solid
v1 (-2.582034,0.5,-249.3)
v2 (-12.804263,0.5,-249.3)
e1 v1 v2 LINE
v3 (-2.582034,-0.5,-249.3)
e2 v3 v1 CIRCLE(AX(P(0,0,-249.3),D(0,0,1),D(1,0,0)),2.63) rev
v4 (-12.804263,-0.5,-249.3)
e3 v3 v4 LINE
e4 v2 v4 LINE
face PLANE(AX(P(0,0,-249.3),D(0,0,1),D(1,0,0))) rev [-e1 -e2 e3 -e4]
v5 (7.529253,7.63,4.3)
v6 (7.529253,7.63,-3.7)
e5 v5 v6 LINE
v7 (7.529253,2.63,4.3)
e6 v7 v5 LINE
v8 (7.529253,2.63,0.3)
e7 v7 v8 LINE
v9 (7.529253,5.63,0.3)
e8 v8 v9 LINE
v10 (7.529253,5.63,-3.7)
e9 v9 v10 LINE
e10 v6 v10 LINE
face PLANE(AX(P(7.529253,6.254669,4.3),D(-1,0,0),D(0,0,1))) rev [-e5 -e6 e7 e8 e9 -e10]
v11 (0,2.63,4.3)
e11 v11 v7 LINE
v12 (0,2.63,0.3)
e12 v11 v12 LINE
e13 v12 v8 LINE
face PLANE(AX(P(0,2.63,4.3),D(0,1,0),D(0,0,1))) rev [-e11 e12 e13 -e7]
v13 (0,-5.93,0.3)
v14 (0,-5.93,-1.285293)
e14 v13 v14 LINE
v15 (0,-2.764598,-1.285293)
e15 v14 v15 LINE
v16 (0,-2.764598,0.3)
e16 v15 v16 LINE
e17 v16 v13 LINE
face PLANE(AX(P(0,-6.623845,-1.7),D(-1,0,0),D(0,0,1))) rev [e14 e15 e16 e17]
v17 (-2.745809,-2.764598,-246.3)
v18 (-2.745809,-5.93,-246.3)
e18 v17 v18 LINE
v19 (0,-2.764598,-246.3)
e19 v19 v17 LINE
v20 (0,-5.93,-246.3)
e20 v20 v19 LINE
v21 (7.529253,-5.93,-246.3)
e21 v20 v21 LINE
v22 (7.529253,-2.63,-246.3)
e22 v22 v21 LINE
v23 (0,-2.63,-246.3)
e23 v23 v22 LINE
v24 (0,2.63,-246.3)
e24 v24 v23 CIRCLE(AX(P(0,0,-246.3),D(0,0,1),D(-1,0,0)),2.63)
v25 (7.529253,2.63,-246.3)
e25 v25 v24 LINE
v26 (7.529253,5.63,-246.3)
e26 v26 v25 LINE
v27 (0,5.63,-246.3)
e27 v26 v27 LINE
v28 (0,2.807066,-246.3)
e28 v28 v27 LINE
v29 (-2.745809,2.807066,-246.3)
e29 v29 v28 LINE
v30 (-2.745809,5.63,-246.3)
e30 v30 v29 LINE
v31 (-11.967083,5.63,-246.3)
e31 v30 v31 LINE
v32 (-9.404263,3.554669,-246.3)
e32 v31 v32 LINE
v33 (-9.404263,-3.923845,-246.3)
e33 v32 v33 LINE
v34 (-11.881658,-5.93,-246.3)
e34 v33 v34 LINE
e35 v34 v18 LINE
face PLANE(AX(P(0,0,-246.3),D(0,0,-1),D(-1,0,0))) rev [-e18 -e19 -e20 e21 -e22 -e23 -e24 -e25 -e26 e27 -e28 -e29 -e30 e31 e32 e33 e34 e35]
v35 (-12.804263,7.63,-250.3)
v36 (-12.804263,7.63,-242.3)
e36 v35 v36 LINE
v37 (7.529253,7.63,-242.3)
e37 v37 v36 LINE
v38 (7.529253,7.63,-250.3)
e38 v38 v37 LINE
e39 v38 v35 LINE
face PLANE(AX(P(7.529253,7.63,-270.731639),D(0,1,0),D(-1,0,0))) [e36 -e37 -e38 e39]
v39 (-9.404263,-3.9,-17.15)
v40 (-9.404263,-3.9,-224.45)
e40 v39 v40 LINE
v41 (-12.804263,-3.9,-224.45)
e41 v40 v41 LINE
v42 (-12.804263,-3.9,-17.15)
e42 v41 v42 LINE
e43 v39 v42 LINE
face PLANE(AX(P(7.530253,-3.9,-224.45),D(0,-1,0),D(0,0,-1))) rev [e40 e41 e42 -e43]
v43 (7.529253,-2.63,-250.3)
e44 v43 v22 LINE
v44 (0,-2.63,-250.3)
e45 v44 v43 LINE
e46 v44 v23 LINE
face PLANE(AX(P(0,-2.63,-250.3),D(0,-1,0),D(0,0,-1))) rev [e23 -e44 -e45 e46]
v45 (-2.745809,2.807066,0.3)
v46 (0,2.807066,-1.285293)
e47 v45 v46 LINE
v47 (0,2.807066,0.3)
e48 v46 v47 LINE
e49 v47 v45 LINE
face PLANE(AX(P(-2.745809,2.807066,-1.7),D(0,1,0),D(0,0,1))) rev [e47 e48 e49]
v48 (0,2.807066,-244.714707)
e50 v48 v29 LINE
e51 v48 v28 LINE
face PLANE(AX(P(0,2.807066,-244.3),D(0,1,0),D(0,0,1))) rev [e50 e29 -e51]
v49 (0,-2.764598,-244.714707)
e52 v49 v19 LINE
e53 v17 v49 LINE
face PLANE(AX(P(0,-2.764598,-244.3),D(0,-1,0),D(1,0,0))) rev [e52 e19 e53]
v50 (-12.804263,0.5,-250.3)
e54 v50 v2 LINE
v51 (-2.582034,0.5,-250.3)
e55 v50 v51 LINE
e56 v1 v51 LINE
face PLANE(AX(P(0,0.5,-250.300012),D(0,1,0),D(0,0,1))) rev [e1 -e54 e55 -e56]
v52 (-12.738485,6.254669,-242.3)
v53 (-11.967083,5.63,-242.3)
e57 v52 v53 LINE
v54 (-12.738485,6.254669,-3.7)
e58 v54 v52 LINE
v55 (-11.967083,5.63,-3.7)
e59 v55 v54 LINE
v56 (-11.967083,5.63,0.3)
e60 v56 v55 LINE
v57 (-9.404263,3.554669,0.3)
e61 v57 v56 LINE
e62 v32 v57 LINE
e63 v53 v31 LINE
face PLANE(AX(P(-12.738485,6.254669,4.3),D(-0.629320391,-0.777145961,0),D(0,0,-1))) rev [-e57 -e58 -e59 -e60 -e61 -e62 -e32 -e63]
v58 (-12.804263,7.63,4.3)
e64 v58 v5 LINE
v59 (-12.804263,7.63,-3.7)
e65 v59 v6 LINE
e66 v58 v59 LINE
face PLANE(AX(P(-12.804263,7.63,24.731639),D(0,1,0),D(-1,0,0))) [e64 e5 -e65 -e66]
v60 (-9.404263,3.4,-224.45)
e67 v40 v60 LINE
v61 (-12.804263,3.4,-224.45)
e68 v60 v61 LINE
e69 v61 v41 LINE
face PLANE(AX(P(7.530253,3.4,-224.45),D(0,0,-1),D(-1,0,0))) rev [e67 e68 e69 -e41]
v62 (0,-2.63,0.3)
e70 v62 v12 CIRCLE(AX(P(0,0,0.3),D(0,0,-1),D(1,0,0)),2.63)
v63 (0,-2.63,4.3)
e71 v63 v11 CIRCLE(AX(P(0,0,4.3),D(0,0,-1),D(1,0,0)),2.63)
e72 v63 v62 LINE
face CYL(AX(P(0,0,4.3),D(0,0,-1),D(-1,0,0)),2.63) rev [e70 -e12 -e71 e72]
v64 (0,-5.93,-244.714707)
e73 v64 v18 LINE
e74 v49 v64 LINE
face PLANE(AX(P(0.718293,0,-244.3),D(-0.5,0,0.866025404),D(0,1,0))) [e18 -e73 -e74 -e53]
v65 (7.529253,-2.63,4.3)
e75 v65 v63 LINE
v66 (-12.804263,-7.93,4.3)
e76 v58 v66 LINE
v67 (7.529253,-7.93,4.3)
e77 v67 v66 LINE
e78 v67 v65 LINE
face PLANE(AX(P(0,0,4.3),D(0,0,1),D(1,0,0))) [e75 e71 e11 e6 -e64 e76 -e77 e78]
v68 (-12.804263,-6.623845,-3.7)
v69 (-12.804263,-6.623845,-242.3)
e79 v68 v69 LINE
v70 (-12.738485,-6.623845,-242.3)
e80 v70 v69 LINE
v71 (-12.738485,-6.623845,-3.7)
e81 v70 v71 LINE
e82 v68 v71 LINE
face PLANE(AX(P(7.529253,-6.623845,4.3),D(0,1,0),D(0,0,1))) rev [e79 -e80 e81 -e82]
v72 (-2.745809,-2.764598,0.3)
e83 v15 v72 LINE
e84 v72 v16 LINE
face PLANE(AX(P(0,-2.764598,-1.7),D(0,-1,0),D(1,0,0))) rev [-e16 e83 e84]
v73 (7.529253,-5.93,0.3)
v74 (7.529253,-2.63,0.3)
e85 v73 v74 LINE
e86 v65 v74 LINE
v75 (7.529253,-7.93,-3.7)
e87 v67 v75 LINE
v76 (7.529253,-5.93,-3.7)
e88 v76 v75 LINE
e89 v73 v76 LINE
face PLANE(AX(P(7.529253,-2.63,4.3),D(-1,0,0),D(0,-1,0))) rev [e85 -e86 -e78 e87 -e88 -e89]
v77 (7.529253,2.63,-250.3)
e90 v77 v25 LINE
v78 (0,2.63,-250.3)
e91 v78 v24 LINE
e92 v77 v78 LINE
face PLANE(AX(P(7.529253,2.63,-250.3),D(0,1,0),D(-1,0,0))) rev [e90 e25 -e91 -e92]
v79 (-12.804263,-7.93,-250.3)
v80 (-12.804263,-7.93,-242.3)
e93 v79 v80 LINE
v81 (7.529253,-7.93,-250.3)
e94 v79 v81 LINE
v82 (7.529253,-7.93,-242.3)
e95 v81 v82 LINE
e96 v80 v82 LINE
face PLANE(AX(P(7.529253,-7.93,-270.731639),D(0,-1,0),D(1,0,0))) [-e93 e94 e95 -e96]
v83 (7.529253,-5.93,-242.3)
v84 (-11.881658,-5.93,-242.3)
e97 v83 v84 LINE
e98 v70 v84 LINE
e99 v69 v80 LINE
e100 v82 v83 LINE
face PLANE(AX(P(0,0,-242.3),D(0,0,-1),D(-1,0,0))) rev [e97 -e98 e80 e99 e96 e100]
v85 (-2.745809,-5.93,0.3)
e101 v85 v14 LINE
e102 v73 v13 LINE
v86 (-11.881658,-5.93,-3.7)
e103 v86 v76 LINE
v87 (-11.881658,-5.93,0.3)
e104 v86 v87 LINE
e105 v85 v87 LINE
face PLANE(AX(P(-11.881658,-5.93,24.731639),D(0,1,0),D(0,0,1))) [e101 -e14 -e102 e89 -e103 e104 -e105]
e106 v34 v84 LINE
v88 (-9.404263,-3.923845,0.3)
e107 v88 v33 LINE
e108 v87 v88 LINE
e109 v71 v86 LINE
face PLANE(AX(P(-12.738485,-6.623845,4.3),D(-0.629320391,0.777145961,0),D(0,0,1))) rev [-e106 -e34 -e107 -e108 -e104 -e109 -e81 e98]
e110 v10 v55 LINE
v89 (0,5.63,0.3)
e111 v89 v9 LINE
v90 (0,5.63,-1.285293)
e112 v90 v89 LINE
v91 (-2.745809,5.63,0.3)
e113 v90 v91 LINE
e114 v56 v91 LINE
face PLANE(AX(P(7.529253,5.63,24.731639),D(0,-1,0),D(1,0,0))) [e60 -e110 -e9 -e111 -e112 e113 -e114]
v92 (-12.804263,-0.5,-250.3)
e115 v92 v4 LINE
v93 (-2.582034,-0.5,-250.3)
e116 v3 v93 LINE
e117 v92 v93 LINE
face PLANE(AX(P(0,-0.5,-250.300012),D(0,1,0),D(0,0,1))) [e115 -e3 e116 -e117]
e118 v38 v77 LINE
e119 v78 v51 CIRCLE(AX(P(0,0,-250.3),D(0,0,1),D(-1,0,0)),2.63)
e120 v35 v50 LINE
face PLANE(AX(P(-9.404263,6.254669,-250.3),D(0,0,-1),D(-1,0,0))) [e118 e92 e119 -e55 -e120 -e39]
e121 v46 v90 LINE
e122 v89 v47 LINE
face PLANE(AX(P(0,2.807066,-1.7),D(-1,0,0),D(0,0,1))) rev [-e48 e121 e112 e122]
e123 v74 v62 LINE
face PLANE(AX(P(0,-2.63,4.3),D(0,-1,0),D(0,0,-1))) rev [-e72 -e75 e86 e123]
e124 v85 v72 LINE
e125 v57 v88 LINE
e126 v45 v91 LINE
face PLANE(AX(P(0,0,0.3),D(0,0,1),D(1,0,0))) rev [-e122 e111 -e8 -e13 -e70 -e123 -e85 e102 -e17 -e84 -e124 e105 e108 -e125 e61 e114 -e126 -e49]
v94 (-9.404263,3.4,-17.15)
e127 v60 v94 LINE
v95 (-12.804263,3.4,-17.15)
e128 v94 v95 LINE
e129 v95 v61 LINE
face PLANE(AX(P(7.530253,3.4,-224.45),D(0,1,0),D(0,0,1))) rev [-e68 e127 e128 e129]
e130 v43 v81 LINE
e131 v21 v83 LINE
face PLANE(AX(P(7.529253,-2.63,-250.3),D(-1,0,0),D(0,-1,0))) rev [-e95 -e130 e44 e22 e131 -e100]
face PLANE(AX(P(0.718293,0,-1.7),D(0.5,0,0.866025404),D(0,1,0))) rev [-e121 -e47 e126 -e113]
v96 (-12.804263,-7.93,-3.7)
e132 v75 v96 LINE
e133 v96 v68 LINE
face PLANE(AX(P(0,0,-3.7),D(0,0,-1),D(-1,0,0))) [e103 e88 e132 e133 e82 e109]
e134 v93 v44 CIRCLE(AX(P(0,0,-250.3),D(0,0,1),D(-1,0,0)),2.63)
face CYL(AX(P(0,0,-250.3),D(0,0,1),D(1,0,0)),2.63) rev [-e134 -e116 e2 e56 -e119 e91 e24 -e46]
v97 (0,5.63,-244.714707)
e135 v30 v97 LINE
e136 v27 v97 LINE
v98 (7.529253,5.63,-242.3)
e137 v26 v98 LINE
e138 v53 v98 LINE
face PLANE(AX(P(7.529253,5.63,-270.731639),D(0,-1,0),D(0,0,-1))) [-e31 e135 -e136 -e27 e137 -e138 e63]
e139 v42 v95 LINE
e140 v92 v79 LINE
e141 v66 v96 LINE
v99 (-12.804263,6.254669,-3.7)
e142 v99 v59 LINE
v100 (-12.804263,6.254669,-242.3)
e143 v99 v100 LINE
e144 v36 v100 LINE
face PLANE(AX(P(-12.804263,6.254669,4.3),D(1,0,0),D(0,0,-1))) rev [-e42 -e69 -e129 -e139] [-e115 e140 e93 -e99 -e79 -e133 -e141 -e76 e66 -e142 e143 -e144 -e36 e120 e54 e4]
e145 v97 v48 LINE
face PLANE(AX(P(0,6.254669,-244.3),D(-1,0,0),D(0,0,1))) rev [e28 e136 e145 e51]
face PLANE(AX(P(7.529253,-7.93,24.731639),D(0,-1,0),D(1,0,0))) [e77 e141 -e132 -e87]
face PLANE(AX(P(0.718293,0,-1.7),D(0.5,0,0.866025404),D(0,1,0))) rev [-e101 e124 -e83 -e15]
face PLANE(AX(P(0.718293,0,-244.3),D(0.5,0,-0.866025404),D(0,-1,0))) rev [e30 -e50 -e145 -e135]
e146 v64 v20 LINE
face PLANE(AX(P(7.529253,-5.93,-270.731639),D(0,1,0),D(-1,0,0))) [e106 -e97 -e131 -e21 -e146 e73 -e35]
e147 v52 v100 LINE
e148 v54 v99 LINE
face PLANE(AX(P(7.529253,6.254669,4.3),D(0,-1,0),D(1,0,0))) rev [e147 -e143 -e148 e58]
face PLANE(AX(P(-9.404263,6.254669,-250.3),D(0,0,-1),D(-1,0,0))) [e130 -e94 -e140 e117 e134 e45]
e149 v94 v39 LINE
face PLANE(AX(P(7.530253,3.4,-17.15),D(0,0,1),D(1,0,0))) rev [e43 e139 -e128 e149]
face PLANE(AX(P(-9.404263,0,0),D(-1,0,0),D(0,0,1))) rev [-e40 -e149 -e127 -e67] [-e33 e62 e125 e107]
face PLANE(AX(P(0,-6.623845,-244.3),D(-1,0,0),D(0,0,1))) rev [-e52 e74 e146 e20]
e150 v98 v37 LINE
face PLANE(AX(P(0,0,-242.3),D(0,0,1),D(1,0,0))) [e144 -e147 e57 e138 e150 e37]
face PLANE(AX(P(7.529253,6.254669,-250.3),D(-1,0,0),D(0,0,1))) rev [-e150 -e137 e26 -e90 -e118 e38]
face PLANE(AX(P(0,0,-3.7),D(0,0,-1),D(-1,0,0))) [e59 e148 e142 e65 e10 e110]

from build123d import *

# Parameters (mm, degrees)
EXTRUDE_START              = 0.3
EXTRUDE_1_DEPTH            = 4
EXTRUDE_2_DEPTH            = 4
SKETCH_3_W                 = 254.6
SKETCH_3_H                 = 12.878514778
EXTRUDE_3_DEPTH            = 3.4
CUT_EXTRUDE_1_REACH        = 253.212
SKETCH_4_W                 = 207.3
SKETCH_4_H                 = 7.3
SKETCH_5_W                 = 2.745808793
SKETCH_5_H                 = 3.85924733
SKETCH_5_H_2               = 3.447603815
EXTRUDE_4_DEPTH            = 2
SKETCH_6_W                 = 2.745808793
SKETCH_6_H                 = 3.85924733
SKETCH_6_H_2               = 3.447603815
EXTRUDE_5_DEPTH            = 2
CHAMFER_1_SIZE             = 3.464101615
CHAMFER_1_SIZE_2           = 2
CHAMFER_2_SIZE             = 2.7
CHAMFER_2_SIZE2            = 3.334222323
EXTRUDE_START_2            = -4
SKETCH_7_W                 = 20.333516096
SKETCH_7_H                 = 2
EXTRUDE_6_DEPTH            = 8
EXTRUDE_7_DEPTH            = 4
EXTRUDE_7_DEPTH_BACK       = 4
CUT_EXTRUDE_1_2_DEPTH      = 256.045082384
CUT_EXTRUDE_1_2_DEPTH_BACK = 1
SKETCH_9_W                 = 12.804262888
SKETCH_9_H                 = 1


with BuildPart() as part:
    # 草图1 → 凸台-拉伸1 (new body)
    with BuildSketch(Plane.XY.offset(EXTRUDE_START)):
        with BuildLine():
            Line((7.529253208, 6.254669476), (-12.804262888, 6.254669476))
            Line((-12.804262888, 6.254669476), (-12.804262888, -6.623845302))
            Line((-12.804262888, -6.623845302), (7.529253208, -6.623845302))
            Line((7.529253208, -6.623845302), (7.529253208, -2.63))
            Line((7.529253208, -2.63), (0, -2.63))
            ThreePointArc((0, -2.63), (-2.63, 0), (0, 2.63))
            Line((0, 2.63), (7.529253208, 2.63))
            Line((7.529253208, 2.63), (7.529253208, 6.254669476))
        make_face()
    extrude(amount=EXTRUDE_1_DEPTH)



with BuildPart() as body_2:
    # 草图2 → 凸台-拉伸2 (new body)
    with BuildSketch(Plane(origin=(0, 0, -246.3), x_dir=(-1, 0, 0), z_dir=(0, 0, -1))):
        with BuildLine():
            Line((-7.529253208, 6.254669476), (-7.529253208, 2.63))
            Line((-7.529253208, 2.63), (0, 2.63))
            ThreePointArc((0, 2.63), (2.63, 0), (0, -2.63))
            Line((0, -2.63), (-7.529253208, -2.63))
            Line((-7.529253208, -2.63), (-7.529253208, -6.623845302))
            Line((-7.529253208, -6.623845302), (12.804262888, -6.623845302))
            Line((12.804262888, -6.623845302), (12.804262888, 6.254669476))
            Line((12.804262888, 6.254669476), (-7.529253208, 6.254669476))
        make_face()
    extrude(amount=EXTRUDE_2_DEPTH)


with BuildPart() as part_1:
    add(part.part)

    add(body_2.part)  # 凸台-拉伸3 merges body 2
    # 草图3 → 凸台-拉伸3 (add)
    with BuildSketch(Plane.ZY.offset(12.804262888)):
        with Locations((-123, -0.184587913)):
            Rectangle(SKETCH_3_W, SKETCH_3_H)
    extrude(amount=-EXTRUDE_3_DEPTH)

    # 草图4 → Cut-Extrude 1 (cut, up to next)
    with BuildSketch(Plane.ZY.offset(12.804262888), mode=Mode.PRIVATE) as cut_extrude_1_sk1:
        with Locations((-120.8, -0.25)):
            Rectangle(SKETCH_4_W, SKETCH_4_H)
    cut_extrude_1_tool1 = extrude(cut_extrude_1_sk1.sketch, amount=-CUT_EXTRUDE_1_REACH, mode=Mode.PRIVATE) & part_1.part
    add(cut_extrude_1_tool1.solids().sort_by_distance((-12.804263, -0.25, -120.8))[0], mode=Mode.SUBTRACT)

    # 草图5 → 凸台-拉伸4 (add)
    with BuildSketch(Plane.XY.offset(-246.3)):
        with Locations((-1.372904397, -4.694221637)):
            Rectangle(SKETCH_5_W, SKETCH_5_H)
        with Locations((-1.372904397, 4.530867568)):
            Rectangle(SKETCH_5_W, SKETCH_5_H_2)
    extrude(amount=EXTRUDE_4_DEPTH)

    # 草图6 → 凸台-拉伸5 (add)
    with BuildSketch(Plane(origin=(0, 0, 0.3), x_dir=(-1, 0, 0), z_dir=(0, 0, -1))):
        with Locations((1.372904397, -4.694221637)):
            Rectangle(SKETCH_6_W, SKETCH_6_H)
        with Locations((1.372904397, 4.530867568)):
            Rectangle(SKETCH_6_W, SKETCH_6_H_2)
    extrude(amount=EXTRUDE_5_DEPTH)

    # 倒角1
    # the kernel refuses this chamfer: 3.464101615, 2 mm, written as the material it takes off along each edge
    with BuildSketch(Plane(origin=(-2.745808793, 15.216597417, -244.3), x_dir=(0.9998132206222079, 0, 0.01932676561270368), z_dir=(0, -1, 0))) as chamfer_1_piece_1_section:
        Polygon((CHAMFER_1_SIZE * 0.999813220662, -CHAMFER_1_SIZE * 0.0193267656135), (-CHAMFER_1_SIZE_2 * 0.0193267656127, -CHAMFER_1_SIZE_2 * 0.999813220622), (0, 0), align=None)
    chamfer_1_piece_1 = extrude(amount=21.371459697, mode=Mode.PRIVATE)
    chamfer_1_piece_1 = split(chamfer_1_piece_1, bisect_by=Plane(origin=(-1.581226814, 4.530867568, -246.3), z_dir=(0, 0, 1)), keep=Keep.TOP, mode=Mode.PRIVATE)
    add(chamfer_1_piece_1, mode=Mode.SUBTRACT)
    with BuildSketch(Plane(origin=(-2.745808793, -15.585773243, -244.3), x_dir=(-0.057893862402670956, 0, -0.9983227437537926), z_dir=(0, 1, 0))) as chamfer_1_piece_2_section:
        Polygon((CHAMFER_1_SIZE_2 * 0.998322743754, -CHAMFER_1_SIZE_2 * 0.0578938624027), (-CHAMFER_1_SIZE * 0.057893862405, -CHAMFER_1_SIZE * 0.998322743793), (0, 0), align=None)
    chamfer_1_piece_2 = extrude(amount=21.783103212, mode=Mode.PRIVATE)
    chamfer_1_piece_2 = split(chamfer_1_piece_2, bisect_by=Plane(origin=(-1.581226814, -4.694221637, -246.3), z_dir=(0, 0, 1)), keep=Keep.TOP, mode=Mode.PRIVATE)
    add(chamfer_1_piece_2, mode=Mode.SUBTRACT)
    with BuildSketch(Plane(origin=(-2.745808793, 6.197329969, -1.7), x_dir=(-0.057893862402671255, 0, 0.9983227437537926), z_dir=(0, -1, 0))) as chamfer_1_piece_3_section:
        Polygon((CHAMFER_1_SIZE_2 * 0.998322743754, -CHAMFER_1_SIZE_2 * 0.0578938624027), (-CHAMFER_1_SIZE * 0.057893862405, -CHAMFER_1_SIZE * 0.998322743793), (0, 0), align=None)
    chamfer_1_piece_3 = extrude(amount=21.783103212, mode=Mode.PRIVATE)
    chamfer_1_piece_3 = split(chamfer_1_piece_3, bisect_by=Plane(origin=(-1.581226814, -4.694221637, 0.3), z_dir=(0, 0, -1)), keep=Keep.TOP, mode=Mode.PRIVATE)
    add(chamfer_1_piece_3, mode=Mode.SUBTRACT)
    with BuildSketch(Plane(origin=(-2.745808793, 15.216597417, -1.7), x_dir=(-0.057893862402671255, 0, 0.9983227437537926), z_dir=(0, -1, 0))) as chamfer_1_piece_4_section:
        Polygon((CHAMFER_1_SIZE_2 * 0.998322743754, -CHAMFER_1_SIZE_2 * 0.0578938624027), (-CHAMFER_1_SIZE * 0.057893862405, -CHAMFER_1_SIZE * 0.998322743793), (0, 0), align=None)
    chamfer_1_piece_4 = extrude(amount=21.371459697, mode=Mode.PRIVATE)
    chamfer_1_piece_4 = split(chamfer_1_piece_4, bisect_by=Plane(origin=(-1.581226814, 4.530867568, 0.3), z_dir=(0, 0, -1)), keep=Keep.TOP, mode=Mode.PRIVATE)
    add(chamfer_1_piece_4, mode=Mode.SUBTRACT)

    # 倒角2
    chamfer_2_edges = [part_1.edges().sort_by_distance(p)[0] for p in [
        (-9.404262888, 6.254669476, -123),
        (-9.404262888, -6.623845302, -123),
    ]]
    chamfer_2_side = [part_1.faces().sort_by_distance(p)[0] for p in [
        (-9.404262888, -4.154484734, -123),
    ]]
    chamfer(chamfer_2_edges, length=CHAMFER_2_SIZE, length2=CHAMFER_2_SIZE2, reference=chamfer_2_side[0])

    # 草图7 → 凸台-拉伸6 (add)
    with BuildSketch(Plane.XY.offset(-246.3).offset(EXTRUDE_START_2)):
        with Locations((-2.63750484, -6.93)):
            Rectangle(SKETCH_7_W, SKETCH_7_H)
        with Locations((-2.63750484, 6.63)):
            Rectangle(SKETCH_7_W, SKETCH_7_H)
    extrude(amount=EXTRUDE_6_DEPTH)

    # 草图8 → 凸台-拉伸7 (add, two sides: drawn at the far end of the back side and taken through both)
    with BuildSketch(Plane(origin=(0, 0, 0.3), x_dir=(-1, 0, 0), z_dir=(0, 0, -1)).offset(-EXTRUDE_7_DEPTH_BACK)):
        Polygon((12.738485211, -6.623845302), (11.88165762, -5.93), (-7.529253208, -5.93), (-7.529253208, -7.93), (12.804262888, -7.93), (12.804262888, -6.623845302), align=None)
        Polygon((12.738485211, 6.254669476), (12.804262888, 6.254669476), (12.804262888, 7.63), (-7.529253208, 7.63), (-7.529253208, 5.63), (11.967082651, 5.63), align=None)
    extrude(amount=EXTRUDE_7_DEPTH + EXTRUDE_7_DEPTH_BACK)

    # 草图9 → Cut-Extrude 1 2 (cut, two sides: drawn at the far end of the back side and taken through both)
    with BuildSketch(Plane(origin=(0, 0, -250.3), x_dir=(-1, 0, 0), z_dir=(0, 0, -1)).offset(-CUT_EXTRUDE_1_2_DEPTH_BACK)):
        with Locations((6.402131444, 0)):
            Rectangle(SKETCH_9_W, SKETCH_9_H)
    extrude(amount=CUT_EXTRUDE_1_2_DEPTH + CUT_EXTRUDE_1_2_DEPTH_BACK, mode=Mode.SUBTRACT)


solid = part_1.part
